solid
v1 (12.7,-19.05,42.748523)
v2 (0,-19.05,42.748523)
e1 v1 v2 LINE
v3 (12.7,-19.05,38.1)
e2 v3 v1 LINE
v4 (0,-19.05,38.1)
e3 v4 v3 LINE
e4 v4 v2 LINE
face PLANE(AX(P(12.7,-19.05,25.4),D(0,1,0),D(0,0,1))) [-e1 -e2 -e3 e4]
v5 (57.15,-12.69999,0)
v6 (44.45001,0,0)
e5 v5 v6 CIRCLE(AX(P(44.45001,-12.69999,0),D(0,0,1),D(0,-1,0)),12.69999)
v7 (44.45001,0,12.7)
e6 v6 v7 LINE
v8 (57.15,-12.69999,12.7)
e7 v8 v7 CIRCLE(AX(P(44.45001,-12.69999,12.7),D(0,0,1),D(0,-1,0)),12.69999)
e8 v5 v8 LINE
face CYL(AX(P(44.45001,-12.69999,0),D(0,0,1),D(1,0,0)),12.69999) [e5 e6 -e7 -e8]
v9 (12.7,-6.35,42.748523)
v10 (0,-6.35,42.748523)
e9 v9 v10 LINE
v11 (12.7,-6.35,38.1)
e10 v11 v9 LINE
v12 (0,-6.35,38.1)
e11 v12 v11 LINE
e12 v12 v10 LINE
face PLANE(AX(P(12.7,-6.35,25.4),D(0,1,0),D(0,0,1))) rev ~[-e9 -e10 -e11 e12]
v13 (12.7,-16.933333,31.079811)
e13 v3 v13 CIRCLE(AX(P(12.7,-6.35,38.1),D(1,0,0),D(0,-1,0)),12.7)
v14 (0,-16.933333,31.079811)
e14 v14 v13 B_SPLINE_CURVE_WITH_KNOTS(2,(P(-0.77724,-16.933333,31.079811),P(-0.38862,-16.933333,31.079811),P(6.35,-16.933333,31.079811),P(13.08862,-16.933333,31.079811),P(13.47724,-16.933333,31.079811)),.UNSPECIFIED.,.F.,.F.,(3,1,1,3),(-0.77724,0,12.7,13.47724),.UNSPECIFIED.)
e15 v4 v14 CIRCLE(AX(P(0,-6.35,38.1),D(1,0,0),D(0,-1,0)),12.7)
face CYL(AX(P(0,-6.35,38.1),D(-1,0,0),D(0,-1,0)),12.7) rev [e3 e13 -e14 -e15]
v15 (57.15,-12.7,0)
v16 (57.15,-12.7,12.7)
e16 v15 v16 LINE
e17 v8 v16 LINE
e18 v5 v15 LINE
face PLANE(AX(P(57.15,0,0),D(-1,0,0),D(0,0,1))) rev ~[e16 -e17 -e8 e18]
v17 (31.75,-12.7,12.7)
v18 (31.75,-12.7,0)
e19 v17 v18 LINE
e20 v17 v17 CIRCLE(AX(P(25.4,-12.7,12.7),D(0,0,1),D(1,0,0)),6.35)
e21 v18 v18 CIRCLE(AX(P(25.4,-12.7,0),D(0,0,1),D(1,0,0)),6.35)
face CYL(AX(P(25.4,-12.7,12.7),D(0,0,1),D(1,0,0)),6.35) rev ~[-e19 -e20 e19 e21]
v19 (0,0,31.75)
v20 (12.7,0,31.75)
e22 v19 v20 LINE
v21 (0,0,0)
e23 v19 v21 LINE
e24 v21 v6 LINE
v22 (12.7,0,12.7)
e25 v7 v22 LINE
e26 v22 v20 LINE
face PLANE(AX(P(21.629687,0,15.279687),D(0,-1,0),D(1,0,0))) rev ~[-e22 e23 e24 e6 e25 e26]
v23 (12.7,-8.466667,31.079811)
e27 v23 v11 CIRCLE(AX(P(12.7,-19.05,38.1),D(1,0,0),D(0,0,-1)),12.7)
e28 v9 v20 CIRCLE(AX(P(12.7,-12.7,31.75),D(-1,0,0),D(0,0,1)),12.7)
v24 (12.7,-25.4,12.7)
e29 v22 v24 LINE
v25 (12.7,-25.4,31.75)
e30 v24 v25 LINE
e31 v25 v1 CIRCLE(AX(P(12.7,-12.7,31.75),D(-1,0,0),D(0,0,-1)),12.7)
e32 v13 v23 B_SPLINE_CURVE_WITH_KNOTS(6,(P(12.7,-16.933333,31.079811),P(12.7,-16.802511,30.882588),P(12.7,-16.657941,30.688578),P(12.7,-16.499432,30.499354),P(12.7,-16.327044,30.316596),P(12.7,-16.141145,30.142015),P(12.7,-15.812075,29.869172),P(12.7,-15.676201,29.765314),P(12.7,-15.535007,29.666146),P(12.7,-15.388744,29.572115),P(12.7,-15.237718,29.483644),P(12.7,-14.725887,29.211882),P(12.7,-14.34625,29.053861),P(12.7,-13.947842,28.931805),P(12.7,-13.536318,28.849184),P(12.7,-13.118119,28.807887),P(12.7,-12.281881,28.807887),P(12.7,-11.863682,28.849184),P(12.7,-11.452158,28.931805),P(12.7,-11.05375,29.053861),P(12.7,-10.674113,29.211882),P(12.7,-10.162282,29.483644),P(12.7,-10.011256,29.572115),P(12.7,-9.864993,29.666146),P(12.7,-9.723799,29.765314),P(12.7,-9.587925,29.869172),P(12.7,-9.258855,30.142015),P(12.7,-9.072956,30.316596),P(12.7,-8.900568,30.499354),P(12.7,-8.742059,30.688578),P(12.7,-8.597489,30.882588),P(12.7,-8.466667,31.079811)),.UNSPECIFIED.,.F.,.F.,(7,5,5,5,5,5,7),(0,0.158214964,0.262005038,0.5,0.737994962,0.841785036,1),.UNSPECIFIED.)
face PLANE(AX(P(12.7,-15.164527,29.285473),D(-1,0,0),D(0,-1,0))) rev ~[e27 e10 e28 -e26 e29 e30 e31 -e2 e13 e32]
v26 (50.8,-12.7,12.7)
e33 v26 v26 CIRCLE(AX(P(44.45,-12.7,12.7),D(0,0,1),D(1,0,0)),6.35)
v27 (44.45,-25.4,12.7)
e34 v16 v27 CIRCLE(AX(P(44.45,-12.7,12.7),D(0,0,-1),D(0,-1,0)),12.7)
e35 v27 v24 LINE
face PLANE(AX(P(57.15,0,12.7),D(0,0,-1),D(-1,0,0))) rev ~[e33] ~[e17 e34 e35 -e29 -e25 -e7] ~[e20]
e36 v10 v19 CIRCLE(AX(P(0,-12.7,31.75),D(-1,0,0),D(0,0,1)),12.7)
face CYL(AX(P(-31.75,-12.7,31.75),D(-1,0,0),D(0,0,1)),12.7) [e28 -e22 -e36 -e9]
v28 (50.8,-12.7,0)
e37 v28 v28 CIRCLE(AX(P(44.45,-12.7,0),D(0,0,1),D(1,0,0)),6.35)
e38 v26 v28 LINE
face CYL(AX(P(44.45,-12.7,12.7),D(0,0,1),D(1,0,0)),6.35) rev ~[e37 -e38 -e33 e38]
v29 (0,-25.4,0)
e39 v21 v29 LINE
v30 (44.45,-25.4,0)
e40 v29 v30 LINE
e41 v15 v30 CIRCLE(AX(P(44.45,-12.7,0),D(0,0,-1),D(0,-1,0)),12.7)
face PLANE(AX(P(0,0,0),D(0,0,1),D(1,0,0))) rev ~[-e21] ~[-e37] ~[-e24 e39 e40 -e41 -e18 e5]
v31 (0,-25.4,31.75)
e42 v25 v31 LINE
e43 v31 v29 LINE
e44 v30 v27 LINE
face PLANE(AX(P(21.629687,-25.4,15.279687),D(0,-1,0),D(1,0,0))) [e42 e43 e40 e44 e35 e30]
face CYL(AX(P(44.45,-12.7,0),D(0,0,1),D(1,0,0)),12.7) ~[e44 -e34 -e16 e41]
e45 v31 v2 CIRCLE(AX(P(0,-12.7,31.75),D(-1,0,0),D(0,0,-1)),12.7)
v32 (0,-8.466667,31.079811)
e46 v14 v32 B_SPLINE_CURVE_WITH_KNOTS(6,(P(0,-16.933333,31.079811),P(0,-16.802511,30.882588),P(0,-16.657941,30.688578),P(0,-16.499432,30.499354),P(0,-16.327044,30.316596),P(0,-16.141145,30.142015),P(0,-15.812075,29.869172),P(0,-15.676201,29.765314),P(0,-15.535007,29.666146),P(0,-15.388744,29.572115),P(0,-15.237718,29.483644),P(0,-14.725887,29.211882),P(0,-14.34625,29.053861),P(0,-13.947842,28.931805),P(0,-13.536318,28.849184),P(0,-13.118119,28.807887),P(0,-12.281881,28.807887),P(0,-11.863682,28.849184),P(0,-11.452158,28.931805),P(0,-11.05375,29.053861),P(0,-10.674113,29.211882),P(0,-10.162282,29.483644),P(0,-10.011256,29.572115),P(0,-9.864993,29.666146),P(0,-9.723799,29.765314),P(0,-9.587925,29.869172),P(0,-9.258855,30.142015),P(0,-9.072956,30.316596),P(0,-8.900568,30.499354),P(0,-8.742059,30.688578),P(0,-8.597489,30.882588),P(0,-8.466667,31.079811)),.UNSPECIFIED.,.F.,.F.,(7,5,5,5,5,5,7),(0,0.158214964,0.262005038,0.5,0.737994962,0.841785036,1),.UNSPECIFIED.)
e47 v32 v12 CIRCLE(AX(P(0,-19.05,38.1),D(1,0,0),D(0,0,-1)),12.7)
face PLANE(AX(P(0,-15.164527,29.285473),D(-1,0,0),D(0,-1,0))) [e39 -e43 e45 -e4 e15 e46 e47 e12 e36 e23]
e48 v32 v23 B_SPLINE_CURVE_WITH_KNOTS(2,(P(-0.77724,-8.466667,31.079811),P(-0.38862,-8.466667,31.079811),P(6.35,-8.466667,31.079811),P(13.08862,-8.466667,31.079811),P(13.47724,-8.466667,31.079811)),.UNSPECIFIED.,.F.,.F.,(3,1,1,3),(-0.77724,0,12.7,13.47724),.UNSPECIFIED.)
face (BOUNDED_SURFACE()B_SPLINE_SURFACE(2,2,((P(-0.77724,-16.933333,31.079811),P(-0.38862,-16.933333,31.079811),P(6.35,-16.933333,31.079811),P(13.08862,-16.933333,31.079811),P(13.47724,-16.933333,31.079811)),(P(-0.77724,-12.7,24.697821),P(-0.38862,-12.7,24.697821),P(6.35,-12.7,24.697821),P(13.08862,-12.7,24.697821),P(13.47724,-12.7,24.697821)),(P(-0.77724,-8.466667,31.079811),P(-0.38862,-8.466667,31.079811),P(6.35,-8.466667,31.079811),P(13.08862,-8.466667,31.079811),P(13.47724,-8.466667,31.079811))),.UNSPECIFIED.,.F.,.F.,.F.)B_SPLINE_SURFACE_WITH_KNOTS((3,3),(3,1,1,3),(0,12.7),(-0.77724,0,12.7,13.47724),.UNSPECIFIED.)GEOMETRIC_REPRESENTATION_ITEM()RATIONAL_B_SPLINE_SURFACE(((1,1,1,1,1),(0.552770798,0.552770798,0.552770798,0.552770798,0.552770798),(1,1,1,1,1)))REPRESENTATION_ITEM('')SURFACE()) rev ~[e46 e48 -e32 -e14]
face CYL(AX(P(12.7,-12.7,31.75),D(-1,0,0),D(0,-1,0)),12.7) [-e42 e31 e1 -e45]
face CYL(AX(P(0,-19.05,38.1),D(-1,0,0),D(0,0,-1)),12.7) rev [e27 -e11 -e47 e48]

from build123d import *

# Parameters (mm, degrees)
F1_DEPTH    = 25.4
F2_R        = 12.7
F3_R        = 12.69999
F4_R        = 12.7
F5_T1_DEPTH = 76.2
F6_W        = 12.7
F6_H        = 17.3485226281
F7_DEPTH    = 25.4
F9_T1_DEPTH = 12.7
F10_R       = 5.08
F11_R       = 6.35
F12_DEPTH   = 12.7


# Not quite as in the source:
# - a fillet or chamfer that OpenCascade refuses, or shapes differently, is made with other operations: its cross-section is extruded or revolved along the edge and cut away or added
# - a fillet or chamfer is up to 0.001 mm smaller than in the source, because OpenCascade refuses the exact size
# - a feature of the source that left no trace in its solid (it failed there, or was rolled back) is left out


with BuildPart() as f1:
    # F0 (on Front) → F1 (new body)
    with BuildSketch(Plane.XZ):
        Polygon((0, 44.45), (0, 0), (57.15, 0), (57.15, 12.7), (12.7, 12.7), (12.7, 44.45), align=None)
    extrude(amount=F1_DEPTH)

    # F2
    f2_edges = [f1.edges().sort_by_distance(p)[0] for p in [
        (57.15, -25.4, 6.35),
    ]]
    fillet(f2_edges, radius=F2_R)

    # F3 (radius 12.7 in the source; OpenCascade refuses exactly that, so slightly less here)
    f3_edges = [f1.edges().sort_by_distance(p)[0] for p in [
        (57.15, 0, 6.35),
    ]]
    fillet(f3_edges, radius=F3_R)

    # F4
    f4_edges = [f1.edges().sort_by_distance(p)[0] for p in [
        (6.35, -25.4, 44.45),
    ]]
    fillet(f4_edges, radius=F4_R)

    # F5: fillet of radius 12.7 on 1 edges, made by hand

    # F5_s2 → F5_t1 (cut)
    with BuildSketch(Plane.YZ.offset(-31.75)):
        with BuildLine():
            ThreePointArc((-12.7, 44.45), (-3.7197438789, 40.7302561211), (0, 31.75))
            Line((0, 31.75), (0, 44.45))
            Line((0, 44.45), (-12.7, 44.45))
        make_face()
    extrude(amount=F5_T1_DEPTH, mode=Mode.SUBTRACT)

    # F6 (on face) → F7 (cut)
    with BuildSketch(Plane.YZ.offset(12.7)):
        with BuildLine():
            ThreePointArc((-12.7, 44.45), (-15.9870018728, 44.0172579939), (-19.05, 42.7485226281))
            Line((-19.05, 42.7485226281), (-6.35, 42.7485226281))
            ThreePointArc((-6.35, 42.7485226281), (-9.4129981272, 44.0172579939), (-12.7, 44.45))
        make_face()
        with Locations((-12.7, 34.074261314)):
            Rectangle(F6_W, F6_H)
    extrude(amount=-F7_DEPTH, mode=Mode.SUBTRACT)

    # F9: fillet of radius 12.7 on 2 edges, made by hand

    # F9_s2 → F9_t1 (join)
    with BuildSketch(Plane.YZ):
        with BuildLine():
            ThreePointArc((-19.05, 38.1), (-15.3302561211, 29.1197438789), (-6.35, 25.4))
            Line((-6.35, 25.4), (-19.05, 25.4))
            Line((-19.05, 25.4), (-19.05, 38.1))
        make_face()
        with BuildLine():
            ThreePointArc((-19.05, 25.4), (-10.0697438789, 29.1197438789), (-6.35, 38.1))
            Line((-6.35, 38.1), (-6.35, 25.4))
            Line((-6.35, 25.4), (-19.05, 25.4))
        make_face()
    extrude(amount=F9_T1_DEPTH)

    # F10
    f10_edges = [f1.edges().sort_by_distance(p)[0] for p in [
        (6.35, -12.7, 27.101477),
    ]]
    fillet(f10_edges, radius=F10_R)

    # F11 (on face) → F12 (cut)
    with BuildSketch(Plane.XY.offset(12.7)):
        with Locations((25.4, -12.7)):
            Circle(F11_R)
        with Locations((44.45, -12.7)):
            Circle(F11_R)
    extrude(amount=-F12_DEPTH, mode=Mode.SUBTRACT)


solid = f1.part
